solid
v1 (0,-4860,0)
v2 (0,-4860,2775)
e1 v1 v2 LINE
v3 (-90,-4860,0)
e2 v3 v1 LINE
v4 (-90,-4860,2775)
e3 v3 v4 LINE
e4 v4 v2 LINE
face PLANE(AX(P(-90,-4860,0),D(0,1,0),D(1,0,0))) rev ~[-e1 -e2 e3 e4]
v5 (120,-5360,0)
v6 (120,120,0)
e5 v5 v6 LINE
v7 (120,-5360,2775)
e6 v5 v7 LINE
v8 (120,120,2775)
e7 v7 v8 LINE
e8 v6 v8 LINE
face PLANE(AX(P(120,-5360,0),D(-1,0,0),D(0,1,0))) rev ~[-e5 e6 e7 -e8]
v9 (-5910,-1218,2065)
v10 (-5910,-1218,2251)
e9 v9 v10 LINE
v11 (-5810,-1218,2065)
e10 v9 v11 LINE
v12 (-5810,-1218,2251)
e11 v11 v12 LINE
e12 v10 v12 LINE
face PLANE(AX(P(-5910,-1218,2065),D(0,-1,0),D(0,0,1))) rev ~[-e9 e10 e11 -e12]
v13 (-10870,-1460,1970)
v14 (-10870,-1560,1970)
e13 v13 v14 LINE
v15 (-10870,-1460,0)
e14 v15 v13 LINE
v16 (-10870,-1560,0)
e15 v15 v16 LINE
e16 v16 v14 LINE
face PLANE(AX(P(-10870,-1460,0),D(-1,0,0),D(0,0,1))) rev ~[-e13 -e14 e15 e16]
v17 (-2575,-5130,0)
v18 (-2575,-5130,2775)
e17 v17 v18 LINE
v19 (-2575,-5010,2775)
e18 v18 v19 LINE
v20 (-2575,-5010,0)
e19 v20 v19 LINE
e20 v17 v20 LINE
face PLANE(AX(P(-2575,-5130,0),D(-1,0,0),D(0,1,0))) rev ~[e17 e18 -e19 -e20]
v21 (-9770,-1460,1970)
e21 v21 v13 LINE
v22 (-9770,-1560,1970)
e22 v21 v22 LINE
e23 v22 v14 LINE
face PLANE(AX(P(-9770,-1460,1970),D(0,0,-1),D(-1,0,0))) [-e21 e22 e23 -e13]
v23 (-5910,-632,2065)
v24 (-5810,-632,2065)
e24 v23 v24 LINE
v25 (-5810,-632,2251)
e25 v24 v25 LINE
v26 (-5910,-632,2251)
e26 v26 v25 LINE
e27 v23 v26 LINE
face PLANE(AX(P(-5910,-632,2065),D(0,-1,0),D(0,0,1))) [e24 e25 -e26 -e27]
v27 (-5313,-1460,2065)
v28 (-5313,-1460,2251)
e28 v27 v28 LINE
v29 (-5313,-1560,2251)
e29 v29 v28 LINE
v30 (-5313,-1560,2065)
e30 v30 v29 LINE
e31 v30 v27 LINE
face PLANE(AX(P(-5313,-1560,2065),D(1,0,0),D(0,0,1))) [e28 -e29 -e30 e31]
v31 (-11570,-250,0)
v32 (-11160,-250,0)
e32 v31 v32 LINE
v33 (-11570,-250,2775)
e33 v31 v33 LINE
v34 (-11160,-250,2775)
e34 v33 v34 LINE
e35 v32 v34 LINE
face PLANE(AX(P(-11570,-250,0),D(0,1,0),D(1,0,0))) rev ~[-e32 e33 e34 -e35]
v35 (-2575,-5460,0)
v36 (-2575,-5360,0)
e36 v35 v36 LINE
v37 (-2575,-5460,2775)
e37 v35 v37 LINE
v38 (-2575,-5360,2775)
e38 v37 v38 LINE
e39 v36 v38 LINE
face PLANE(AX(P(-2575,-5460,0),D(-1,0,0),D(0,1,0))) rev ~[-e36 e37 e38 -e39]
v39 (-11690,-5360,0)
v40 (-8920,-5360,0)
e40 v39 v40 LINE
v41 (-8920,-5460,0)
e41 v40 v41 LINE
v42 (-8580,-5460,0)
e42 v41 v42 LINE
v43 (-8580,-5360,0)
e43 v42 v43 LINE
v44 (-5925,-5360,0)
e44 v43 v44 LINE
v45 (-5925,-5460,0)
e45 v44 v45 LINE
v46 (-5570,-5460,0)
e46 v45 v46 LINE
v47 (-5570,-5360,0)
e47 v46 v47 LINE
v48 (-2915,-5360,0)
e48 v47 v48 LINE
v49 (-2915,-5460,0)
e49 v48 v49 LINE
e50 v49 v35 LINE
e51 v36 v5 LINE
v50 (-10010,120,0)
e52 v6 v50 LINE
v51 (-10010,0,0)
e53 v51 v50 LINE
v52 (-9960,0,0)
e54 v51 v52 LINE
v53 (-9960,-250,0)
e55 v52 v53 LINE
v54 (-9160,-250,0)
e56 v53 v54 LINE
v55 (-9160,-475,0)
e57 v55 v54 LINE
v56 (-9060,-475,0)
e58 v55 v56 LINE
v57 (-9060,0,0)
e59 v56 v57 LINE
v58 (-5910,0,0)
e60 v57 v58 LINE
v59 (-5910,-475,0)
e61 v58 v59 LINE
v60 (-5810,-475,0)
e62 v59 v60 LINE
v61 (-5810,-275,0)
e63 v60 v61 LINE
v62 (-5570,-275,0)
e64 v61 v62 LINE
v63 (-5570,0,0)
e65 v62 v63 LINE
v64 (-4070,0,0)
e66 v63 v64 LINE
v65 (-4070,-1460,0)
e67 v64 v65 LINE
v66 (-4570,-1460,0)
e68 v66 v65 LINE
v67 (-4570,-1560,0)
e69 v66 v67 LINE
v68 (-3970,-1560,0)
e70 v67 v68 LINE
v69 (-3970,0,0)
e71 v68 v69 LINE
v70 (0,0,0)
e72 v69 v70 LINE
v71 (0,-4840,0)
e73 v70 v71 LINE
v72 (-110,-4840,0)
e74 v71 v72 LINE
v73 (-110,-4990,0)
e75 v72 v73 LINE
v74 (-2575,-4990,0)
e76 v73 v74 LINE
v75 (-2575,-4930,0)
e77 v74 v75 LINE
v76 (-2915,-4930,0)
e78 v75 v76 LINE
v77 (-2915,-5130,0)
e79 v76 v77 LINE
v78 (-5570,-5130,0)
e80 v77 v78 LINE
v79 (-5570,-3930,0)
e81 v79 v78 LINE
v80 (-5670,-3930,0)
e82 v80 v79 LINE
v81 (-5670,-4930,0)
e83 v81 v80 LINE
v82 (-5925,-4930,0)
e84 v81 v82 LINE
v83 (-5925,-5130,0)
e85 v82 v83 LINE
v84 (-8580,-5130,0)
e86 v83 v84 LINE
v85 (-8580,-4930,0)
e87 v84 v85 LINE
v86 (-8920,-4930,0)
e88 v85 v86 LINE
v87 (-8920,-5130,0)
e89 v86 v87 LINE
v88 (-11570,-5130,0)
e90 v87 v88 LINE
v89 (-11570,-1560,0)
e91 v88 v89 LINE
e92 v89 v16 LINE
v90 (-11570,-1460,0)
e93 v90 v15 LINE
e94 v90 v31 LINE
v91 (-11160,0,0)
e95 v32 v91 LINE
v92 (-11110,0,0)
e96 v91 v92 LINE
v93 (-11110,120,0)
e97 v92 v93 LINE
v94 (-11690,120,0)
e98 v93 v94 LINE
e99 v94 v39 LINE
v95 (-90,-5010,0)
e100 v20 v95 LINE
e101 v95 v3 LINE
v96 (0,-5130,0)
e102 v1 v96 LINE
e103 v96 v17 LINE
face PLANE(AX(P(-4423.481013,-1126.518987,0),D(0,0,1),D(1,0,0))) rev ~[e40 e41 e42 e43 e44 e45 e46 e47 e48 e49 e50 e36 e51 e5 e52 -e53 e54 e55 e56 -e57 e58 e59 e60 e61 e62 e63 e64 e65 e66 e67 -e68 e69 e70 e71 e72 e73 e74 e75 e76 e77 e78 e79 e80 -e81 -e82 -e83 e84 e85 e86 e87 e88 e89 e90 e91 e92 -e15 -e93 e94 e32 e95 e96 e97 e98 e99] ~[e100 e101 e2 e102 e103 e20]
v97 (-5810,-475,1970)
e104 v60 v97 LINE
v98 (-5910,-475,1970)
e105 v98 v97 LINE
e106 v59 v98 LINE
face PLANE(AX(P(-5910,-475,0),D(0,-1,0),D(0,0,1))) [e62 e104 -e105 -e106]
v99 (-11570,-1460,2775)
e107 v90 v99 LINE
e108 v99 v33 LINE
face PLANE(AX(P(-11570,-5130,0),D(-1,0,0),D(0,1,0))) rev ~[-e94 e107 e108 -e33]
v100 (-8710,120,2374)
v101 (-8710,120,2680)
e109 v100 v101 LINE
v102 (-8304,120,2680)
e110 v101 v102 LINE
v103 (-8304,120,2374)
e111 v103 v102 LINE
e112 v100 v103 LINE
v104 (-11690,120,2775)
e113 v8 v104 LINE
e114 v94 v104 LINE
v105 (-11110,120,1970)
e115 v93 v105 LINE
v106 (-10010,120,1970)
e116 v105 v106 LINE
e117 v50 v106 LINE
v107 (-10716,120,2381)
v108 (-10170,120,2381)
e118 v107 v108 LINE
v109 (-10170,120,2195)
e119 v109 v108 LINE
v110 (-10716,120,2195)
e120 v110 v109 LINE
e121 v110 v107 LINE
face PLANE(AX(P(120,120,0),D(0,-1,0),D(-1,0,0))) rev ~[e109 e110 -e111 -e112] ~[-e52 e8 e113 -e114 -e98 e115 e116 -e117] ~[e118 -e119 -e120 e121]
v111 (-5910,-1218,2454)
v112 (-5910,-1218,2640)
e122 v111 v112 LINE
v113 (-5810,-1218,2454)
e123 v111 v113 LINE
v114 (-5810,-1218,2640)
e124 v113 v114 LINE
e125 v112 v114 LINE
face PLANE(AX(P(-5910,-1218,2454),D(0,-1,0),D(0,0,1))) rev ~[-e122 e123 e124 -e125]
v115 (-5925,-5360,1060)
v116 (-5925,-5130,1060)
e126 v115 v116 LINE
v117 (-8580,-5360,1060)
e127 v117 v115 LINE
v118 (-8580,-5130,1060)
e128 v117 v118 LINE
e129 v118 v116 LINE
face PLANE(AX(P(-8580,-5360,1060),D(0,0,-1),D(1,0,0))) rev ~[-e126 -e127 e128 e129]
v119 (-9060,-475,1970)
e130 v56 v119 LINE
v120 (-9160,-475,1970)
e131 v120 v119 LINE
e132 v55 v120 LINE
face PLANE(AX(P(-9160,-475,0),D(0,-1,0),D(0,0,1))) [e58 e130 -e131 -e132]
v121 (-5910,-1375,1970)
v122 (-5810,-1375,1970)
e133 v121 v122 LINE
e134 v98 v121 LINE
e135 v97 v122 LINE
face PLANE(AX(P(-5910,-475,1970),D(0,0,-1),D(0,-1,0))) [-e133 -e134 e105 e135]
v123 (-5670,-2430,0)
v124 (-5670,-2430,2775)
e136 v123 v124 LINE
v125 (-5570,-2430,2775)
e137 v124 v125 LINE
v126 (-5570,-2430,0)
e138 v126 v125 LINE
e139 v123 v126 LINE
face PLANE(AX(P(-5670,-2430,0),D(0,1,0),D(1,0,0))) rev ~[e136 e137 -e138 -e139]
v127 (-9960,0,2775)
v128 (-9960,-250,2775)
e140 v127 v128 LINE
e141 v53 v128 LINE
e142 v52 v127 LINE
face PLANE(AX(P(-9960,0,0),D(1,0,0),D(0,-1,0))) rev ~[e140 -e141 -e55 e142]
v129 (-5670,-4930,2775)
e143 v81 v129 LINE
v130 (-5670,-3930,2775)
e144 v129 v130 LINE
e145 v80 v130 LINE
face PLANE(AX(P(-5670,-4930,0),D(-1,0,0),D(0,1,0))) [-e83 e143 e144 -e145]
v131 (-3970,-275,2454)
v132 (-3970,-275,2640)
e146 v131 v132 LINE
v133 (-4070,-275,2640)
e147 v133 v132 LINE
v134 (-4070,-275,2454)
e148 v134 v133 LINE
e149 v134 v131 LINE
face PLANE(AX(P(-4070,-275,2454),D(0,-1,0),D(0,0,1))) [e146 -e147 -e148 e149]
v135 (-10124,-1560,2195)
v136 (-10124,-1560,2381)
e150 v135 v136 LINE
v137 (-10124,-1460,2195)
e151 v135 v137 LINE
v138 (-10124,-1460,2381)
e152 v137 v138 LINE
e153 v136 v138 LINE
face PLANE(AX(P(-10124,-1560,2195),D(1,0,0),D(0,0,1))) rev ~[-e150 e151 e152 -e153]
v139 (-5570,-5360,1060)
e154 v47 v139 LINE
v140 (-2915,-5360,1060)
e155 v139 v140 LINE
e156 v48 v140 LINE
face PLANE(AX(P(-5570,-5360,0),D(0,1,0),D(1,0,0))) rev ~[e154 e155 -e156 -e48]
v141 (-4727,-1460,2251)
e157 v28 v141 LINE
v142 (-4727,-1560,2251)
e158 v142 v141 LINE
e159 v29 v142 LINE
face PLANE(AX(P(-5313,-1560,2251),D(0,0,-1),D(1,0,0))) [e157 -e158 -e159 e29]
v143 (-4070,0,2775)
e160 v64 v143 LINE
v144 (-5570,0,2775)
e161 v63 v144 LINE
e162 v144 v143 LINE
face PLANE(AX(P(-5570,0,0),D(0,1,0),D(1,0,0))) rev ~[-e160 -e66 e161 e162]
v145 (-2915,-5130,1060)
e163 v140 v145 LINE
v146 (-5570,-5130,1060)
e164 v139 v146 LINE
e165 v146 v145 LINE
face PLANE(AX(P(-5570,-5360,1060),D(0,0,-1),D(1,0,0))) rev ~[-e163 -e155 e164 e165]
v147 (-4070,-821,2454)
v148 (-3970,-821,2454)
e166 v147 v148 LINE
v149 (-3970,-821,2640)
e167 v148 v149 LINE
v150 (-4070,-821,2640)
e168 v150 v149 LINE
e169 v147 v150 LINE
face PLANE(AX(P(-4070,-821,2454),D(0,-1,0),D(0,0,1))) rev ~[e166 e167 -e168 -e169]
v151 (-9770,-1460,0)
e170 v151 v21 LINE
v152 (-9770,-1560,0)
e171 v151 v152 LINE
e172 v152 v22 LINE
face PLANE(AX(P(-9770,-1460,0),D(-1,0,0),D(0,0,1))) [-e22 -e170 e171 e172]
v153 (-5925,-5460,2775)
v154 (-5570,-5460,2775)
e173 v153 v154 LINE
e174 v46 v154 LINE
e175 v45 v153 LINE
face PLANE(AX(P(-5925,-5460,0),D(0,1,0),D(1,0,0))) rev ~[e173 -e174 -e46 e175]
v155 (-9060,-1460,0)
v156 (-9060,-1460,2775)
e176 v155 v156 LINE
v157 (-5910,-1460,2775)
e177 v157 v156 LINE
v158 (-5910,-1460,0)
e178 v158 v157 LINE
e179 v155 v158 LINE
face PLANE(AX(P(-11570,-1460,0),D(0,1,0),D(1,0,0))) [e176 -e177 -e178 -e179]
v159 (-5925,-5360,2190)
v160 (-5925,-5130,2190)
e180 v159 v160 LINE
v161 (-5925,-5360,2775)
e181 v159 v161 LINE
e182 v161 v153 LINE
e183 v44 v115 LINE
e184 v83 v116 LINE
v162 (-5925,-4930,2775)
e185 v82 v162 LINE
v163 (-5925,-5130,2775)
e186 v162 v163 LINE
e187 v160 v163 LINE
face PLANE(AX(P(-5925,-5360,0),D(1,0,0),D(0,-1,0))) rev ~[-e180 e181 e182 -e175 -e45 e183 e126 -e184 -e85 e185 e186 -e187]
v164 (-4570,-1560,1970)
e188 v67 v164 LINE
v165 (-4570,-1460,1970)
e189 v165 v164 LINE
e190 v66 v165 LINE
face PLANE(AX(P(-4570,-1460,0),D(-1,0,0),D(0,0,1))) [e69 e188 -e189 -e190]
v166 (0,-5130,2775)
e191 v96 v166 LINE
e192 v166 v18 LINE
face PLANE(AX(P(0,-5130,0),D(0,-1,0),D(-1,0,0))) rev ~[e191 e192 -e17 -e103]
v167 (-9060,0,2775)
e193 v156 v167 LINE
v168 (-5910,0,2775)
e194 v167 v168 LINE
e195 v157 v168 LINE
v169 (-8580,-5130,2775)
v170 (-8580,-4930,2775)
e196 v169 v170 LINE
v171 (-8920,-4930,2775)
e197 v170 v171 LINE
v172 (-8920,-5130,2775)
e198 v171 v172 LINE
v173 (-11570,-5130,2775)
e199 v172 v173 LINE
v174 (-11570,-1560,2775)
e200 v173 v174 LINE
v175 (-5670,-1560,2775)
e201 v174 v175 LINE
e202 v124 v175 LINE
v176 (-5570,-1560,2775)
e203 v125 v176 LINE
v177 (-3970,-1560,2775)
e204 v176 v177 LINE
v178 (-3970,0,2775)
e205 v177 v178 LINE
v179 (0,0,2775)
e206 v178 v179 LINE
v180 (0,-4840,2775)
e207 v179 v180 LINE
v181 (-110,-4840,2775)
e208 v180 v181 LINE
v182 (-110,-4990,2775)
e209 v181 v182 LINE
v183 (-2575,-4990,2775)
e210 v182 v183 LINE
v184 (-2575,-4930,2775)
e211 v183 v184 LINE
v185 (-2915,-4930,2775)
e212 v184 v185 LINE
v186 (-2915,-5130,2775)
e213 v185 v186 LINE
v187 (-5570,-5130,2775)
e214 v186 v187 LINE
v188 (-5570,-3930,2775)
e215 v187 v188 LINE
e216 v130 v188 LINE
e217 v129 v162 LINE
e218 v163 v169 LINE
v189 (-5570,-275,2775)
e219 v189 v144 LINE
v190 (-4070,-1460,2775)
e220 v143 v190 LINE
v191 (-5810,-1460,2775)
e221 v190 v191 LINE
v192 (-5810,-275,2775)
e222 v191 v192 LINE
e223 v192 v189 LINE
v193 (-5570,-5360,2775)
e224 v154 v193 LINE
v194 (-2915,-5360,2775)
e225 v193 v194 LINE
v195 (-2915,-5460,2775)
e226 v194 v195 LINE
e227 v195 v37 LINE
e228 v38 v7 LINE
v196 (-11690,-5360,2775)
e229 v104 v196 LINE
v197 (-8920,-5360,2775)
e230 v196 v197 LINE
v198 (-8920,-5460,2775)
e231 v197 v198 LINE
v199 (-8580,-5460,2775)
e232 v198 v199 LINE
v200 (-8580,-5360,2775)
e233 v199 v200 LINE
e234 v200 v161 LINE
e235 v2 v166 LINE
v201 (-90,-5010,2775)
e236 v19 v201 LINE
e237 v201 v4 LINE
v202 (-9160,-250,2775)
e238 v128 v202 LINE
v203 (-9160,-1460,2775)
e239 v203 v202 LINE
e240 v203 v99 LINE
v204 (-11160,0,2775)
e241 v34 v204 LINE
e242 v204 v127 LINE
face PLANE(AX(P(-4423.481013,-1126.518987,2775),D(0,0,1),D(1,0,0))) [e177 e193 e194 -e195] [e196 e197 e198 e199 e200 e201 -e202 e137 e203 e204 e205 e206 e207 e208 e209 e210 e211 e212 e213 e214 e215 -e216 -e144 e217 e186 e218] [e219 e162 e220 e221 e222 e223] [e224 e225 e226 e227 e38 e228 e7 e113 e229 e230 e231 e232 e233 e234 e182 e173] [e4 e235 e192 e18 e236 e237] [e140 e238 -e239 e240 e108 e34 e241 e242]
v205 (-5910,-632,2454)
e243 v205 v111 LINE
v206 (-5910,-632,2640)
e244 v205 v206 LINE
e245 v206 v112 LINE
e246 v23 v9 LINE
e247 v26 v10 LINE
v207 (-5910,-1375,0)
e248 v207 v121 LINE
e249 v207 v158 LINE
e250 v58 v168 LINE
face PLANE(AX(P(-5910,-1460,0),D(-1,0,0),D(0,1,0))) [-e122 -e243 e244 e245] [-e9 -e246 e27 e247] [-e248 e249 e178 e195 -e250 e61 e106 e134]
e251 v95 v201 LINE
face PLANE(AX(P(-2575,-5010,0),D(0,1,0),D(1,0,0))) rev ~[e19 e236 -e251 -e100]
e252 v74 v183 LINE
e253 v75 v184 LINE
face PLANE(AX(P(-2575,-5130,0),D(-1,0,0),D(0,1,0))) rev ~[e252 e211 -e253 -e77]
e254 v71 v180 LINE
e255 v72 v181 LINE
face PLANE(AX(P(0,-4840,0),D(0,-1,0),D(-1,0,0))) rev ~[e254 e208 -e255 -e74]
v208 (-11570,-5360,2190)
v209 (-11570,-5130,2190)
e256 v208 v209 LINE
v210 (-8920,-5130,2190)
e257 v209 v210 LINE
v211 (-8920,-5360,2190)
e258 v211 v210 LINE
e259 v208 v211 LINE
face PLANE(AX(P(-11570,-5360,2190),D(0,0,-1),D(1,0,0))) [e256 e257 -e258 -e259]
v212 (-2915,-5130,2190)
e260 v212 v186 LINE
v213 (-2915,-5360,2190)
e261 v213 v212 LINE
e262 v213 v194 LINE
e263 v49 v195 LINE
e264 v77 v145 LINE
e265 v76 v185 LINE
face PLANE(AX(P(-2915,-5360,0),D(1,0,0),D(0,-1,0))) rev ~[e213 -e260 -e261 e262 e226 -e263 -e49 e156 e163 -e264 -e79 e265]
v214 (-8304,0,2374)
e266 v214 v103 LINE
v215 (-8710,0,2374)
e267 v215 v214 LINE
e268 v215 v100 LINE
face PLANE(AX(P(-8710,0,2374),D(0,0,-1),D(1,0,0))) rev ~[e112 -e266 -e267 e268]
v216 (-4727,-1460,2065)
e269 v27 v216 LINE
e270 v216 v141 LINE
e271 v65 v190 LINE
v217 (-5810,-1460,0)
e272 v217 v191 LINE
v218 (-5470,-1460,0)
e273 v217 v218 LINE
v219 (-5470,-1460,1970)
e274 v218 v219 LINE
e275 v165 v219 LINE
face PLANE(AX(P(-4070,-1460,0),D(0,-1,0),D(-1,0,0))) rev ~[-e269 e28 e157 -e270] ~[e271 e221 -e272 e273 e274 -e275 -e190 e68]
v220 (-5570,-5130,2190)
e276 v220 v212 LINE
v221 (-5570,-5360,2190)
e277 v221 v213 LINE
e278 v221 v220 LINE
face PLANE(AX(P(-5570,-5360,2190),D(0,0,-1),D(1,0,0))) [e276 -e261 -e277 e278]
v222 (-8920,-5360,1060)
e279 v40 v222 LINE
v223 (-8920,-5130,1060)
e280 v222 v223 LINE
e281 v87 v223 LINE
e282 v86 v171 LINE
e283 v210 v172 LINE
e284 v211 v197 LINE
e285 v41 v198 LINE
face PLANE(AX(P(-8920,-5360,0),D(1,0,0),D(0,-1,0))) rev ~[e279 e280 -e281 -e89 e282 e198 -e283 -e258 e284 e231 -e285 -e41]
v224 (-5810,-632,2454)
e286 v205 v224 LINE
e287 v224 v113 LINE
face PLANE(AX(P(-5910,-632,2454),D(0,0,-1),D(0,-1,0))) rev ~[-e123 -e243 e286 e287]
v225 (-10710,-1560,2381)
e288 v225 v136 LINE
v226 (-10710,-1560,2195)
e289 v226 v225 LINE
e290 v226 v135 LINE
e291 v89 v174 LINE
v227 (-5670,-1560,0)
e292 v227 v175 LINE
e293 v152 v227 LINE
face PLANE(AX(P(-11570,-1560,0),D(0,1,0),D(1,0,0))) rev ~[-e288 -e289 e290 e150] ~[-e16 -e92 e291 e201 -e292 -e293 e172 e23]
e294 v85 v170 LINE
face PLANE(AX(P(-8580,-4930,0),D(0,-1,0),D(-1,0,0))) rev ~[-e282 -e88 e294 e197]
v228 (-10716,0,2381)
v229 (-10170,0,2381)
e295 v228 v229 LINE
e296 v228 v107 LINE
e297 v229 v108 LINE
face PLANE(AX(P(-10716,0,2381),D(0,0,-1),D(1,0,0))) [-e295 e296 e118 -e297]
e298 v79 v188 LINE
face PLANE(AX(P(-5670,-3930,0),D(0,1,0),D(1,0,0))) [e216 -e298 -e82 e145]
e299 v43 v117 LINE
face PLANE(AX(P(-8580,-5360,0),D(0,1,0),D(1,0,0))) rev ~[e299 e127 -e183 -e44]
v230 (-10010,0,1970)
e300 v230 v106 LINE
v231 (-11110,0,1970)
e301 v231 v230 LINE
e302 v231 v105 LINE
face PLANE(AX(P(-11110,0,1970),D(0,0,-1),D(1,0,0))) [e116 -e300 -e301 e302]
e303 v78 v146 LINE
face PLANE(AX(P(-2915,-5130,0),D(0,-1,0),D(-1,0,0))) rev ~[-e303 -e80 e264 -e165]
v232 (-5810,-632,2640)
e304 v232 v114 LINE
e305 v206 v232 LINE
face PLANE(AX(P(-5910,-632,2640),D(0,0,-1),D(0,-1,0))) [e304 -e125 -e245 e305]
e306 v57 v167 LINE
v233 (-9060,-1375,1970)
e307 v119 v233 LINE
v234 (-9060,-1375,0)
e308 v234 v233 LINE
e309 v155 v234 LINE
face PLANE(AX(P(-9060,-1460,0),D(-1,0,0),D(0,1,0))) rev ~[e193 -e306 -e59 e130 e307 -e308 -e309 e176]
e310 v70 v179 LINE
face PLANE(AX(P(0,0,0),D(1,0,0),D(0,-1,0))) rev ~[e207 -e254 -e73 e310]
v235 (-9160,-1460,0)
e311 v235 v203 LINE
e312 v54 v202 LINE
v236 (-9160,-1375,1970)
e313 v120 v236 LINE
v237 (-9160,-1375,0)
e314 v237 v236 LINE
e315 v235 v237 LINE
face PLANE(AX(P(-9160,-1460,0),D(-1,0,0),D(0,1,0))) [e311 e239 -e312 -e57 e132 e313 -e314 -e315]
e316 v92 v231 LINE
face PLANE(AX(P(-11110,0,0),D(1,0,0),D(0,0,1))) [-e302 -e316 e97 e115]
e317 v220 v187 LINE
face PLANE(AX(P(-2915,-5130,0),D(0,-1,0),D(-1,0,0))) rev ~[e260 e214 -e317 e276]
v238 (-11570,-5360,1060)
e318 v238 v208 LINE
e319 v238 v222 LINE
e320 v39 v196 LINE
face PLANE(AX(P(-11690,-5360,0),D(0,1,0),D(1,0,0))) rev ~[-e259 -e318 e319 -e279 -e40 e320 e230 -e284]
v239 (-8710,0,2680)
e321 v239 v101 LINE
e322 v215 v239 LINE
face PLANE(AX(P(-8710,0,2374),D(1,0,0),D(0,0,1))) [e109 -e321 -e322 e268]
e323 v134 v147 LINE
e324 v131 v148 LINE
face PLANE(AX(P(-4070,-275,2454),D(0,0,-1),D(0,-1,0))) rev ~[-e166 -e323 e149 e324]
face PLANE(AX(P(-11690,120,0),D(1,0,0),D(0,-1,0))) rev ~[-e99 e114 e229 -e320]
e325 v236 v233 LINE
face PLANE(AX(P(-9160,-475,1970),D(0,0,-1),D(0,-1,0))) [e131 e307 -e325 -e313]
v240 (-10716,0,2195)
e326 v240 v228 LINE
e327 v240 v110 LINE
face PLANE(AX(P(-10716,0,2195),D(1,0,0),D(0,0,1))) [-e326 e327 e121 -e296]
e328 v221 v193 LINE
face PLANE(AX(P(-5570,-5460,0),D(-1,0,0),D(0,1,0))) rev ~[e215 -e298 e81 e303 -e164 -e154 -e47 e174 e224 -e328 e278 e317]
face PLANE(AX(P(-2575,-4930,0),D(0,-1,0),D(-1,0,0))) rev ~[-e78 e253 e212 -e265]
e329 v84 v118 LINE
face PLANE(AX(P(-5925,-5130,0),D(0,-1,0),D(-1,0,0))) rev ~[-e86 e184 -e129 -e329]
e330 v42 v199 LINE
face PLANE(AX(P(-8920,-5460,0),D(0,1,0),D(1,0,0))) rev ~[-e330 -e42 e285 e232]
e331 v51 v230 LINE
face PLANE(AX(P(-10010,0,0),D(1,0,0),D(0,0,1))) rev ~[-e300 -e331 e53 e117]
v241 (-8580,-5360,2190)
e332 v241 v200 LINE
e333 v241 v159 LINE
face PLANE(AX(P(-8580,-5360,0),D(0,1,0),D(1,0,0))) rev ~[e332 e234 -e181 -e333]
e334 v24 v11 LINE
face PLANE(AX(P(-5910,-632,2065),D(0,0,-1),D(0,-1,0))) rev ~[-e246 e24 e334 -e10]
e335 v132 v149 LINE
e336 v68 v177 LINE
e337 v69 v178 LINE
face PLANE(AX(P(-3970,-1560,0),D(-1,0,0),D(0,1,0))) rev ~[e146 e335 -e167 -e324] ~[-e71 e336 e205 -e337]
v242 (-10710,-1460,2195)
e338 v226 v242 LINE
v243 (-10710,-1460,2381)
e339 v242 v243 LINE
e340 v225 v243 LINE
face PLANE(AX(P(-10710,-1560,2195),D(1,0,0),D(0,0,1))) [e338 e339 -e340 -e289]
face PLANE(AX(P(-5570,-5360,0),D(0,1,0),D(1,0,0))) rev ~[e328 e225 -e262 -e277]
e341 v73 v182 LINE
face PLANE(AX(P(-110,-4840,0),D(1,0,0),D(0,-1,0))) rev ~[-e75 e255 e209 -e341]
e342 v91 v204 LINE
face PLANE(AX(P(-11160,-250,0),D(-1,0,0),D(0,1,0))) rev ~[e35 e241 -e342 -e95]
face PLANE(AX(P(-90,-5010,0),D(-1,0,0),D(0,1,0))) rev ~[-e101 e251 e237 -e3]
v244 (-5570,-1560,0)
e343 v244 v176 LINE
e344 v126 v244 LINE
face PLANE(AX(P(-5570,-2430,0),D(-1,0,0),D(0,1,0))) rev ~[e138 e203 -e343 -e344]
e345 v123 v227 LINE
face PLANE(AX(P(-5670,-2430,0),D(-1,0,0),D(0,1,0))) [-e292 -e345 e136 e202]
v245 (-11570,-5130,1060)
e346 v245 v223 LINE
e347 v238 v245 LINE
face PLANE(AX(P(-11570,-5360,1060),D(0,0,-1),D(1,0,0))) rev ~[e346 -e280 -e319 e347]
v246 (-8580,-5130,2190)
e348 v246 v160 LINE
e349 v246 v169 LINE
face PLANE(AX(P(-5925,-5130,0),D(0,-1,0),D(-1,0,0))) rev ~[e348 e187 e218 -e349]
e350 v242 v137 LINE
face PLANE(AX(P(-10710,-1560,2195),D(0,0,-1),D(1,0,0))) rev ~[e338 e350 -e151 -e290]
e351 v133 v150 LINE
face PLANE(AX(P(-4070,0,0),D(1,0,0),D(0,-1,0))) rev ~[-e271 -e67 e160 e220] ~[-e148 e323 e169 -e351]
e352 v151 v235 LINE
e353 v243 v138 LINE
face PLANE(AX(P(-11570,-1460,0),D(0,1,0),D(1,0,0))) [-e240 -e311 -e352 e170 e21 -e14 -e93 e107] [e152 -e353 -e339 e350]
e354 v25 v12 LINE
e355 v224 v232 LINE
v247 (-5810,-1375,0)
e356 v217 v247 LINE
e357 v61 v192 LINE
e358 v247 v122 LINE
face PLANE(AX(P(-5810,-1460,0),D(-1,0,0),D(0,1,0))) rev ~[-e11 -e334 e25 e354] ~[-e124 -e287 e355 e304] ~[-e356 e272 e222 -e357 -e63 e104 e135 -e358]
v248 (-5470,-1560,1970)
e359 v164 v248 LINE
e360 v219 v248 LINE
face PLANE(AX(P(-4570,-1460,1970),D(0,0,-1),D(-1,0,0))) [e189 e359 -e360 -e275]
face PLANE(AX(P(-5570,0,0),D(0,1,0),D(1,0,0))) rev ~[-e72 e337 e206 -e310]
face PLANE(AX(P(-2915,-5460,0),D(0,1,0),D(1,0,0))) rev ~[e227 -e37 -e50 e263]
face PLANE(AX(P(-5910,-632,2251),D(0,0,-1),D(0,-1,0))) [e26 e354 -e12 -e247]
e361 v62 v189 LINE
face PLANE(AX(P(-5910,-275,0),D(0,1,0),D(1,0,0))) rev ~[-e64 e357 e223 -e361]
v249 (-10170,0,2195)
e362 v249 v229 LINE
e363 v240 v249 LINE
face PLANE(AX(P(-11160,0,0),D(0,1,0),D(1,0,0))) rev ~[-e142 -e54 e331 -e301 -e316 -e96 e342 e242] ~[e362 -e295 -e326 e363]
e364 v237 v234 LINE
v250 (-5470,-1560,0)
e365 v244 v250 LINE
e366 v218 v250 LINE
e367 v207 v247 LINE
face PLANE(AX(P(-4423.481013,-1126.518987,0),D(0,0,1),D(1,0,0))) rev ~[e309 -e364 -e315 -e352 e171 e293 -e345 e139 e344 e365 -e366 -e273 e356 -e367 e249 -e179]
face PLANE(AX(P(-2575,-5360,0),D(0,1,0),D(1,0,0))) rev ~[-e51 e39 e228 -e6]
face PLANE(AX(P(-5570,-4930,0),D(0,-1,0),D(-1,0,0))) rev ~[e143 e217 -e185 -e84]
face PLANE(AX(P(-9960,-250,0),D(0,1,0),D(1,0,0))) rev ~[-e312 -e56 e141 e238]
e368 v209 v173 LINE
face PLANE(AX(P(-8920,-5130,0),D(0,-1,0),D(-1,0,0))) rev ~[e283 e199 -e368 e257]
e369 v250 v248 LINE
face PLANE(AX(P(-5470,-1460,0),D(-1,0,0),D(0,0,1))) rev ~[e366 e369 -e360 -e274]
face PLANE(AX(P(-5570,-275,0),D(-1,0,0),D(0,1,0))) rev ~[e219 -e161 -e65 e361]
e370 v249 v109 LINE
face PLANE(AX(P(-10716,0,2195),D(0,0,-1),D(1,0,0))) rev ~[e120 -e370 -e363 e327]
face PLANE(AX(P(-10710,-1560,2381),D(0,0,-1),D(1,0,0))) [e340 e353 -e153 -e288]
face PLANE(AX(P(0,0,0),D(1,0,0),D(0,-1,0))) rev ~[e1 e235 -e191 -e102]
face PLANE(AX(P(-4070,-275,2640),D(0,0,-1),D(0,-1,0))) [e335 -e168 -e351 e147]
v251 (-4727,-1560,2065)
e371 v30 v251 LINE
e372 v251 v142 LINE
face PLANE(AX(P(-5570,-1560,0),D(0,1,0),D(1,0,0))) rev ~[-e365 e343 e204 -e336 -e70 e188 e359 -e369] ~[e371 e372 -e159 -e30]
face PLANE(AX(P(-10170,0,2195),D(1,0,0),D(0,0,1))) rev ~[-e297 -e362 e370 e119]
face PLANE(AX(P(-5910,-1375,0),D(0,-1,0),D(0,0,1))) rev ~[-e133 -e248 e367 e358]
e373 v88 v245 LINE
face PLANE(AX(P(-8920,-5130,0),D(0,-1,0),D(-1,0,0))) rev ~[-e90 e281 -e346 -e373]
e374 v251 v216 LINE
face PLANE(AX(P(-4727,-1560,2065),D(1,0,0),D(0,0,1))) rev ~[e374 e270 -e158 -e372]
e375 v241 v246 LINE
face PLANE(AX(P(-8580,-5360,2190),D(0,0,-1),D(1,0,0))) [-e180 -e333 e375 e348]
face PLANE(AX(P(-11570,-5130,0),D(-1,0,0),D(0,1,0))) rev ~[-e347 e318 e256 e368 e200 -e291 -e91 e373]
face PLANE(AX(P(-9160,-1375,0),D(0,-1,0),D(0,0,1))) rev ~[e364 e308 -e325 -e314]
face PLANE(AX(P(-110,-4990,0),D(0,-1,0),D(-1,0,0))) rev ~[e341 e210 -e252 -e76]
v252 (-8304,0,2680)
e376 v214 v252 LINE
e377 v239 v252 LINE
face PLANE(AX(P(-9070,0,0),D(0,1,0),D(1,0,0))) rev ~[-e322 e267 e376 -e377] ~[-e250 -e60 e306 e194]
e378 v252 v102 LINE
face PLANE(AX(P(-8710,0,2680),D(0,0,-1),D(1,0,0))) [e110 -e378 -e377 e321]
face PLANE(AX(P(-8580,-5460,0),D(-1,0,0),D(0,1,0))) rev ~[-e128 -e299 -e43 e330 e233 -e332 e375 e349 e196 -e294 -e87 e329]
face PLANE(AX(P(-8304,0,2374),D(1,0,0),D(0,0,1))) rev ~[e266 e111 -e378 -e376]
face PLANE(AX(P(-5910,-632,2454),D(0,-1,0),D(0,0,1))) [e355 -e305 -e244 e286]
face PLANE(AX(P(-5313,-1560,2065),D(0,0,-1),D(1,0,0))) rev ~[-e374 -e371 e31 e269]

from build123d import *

# Parameters (mm, degrees)
F1_DEPTH  = 2775
F2_W      = 1100
F2_H      = 1970
F3_DEPTH  = 120
F4_W      = 100
F4_H      = 1000
F5_DEPTH  = 2775
F4_H_2    = 970
F6_W      = 5900
F6_H      = 100
F7_DEPTH  = 2775
F8_W      = 100
F8_H      = 1460
F9_DEPTH  = 2775
F10_W     = 1100
F10_H     = 1970
F11_DEPTH = 100
F12_W     = 900
F12_H     = 1970
F13_DEPTH = 100
F14_W     = 100
F14_H     = 1185
F15_DEPTH = 2775
F16_W     = 900
F16_H     = 1970
F17_DEPTH = 100
F19_DEPTH = 2775
F20_W     = 900
F20_H     = 1970
F21_DEPTH = 100
F22_W     = 2655
F22_H     = 1130
F23_DEPTH = 230
F24_W     = 2650
F24_H     = 1130
F24_W_2   = 2655
F25_DEPTH = 230
F26_W     = 406
F26_H     = 306
F27_DEPTH = 120
F28_W     = 546
F28_H     = 186
F29_DEPTH = 100
F30_W     = 586
F30_H     = 186
F31_DEPTH = 100
F32_W     = 546
F32_H     = 186
F33_DEPTH = 120
F34_W     = 586
F34_H     = 186
F35_DEPTH = 100
F37_DEPTH = 2775
F38_W     = 586
F38_H     = 186
F39_DEPTH = 100


# Not quite as in the source:
# - a feature names something its author has since deleted; it is built from what else it names


with BuildPart() as f1:
    # F0 (on Top) → F1 (new body)
    with BuildSketch(Plane.XY):
        Polygon((120, 120), (-11690, 120), (-11690, -5360), (-8920, -5360), (-8920, -5460), (-8580, -5460), (-8580, -5360), (-5925, -5360), (-5925, -5460), (-5570, -5460), (-5570, -5360), (-2915, -5360), (-2915, -5460), (-2575, -5460), (-2575, -5360), (120, -5360), align=None)
        Polygon((-5570, 0), (0, 0), (0, -5130), (-2575, -5130), (-2575, -4930), (-2915, -4930), (-2915, -5130), (-5570, -5130), (-5570, -4930), (-5925, -4930), (-5925, -5130), (-8580, -5130), (-8580, -4930), (-8920, -4930), (-8920, -5130), (-11570, -5130), (-11570, -250), (-11160, -250), (-11160, 0), (-9960, 0), (-9960, -250), (-9070, -250), (-9070, 0), (-5910, 0), (-5910, -275), (-5570, -275), align=None, mode=Mode.SUBTRACT)
    extrude(amount=F1_DEPTH)

    # F2 (on face) → F3 (cut, through all)
    with BuildSketch(Plane.XZ):
        with Locations((-10560, 985)):
            Rectangle(F2_W, F2_H)
    extrude(amount=-F3_DEPTH, mode=Mode.SUBTRACT)

    # F4 (on Top) → F5 (join, through all)
    with BuildSketch(Plane.XY):
        with Locations((-5620, -4430)):
            Rectangle(F4_W, F4_H)
    extrude(amount=F5_DEPTH)



with BuildPart() as f5:
    # F4 (on Top) → F5, piece 2 (new body, through all)
    with BuildSketch(Plane.XY):
        with Locations((-5620, -1945)):
            Rectangle(F4_W, F4_H_2)
    extrude(amount=F5_DEPTH)


with BuildPart() as f1_1:
    add(f1.part)

    add(f5.part)  # F7 merges F5
    # F6 (on Top) → F7 (join, through all)
    with BuildSketch(Plane.XY):
        with Locations((-8620, -1510)):
            Rectangle(F6_W, F6_H)
    extrude(amount=F7_DEPTH)

    # F8 (on Top) → F9 (join, through all)
    with BuildSketch(Plane.XY):
        with Locations((-9110, -730)):
            Rectangle(F8_W, F8_H)
    extrude(amount=F9_DEPTH)

    # F10 (on face) → F11 (cut, through all)
    with BuildSketch(Plane(origin=(0, -1460, 0), x_dir=(-1, 0, 0), z_dir=(0, 1, 0))):
        with Locations((10320, 985)):
            Rectangle(F10_W, F10_H)
    extrude(amount=-F11_DEPTH, mode=Mode.SUBTRACT)

    # F12 (on face) → F13 (cut, through all)
    with BuildSketch(Plane(origin=(-9160, 0, 0), x_dir=(0, -1, 0), z_dir=(-1, 0, 0))):
        with Locations((924.9999999999, 985)):
            Rectangle(F12_W, F12_H)
    extrude(amount=-F13_DEPTH, mode=Mode.SUBTRACT)

    # F14 (on Top) → F15 (join, through all)
    with BuildSketch(Plane.XY):
        with Locations((-5860, -867.5)):
            Rectangle(F14_W, F14_H)
    extrude(amount=F15_DEPTH)

    # F16 (on face) → F17 (cut, through all)
    with BuildSketch(Plane(origin=(-5910, 0, 0), x_dir=(0, -1, 0), z_dir=(-1, 0, 0))):
        with Locations((925, 985)):
            Rectangle(F16_W, F16_H)
    extrude(amount=-F17_DEPTH, mode=Mode.SUBTRACT)

    # F18 (on Top) → F19 (join, through all)
    with BuildSketch(Plane.XY):
        Polygon((-5570, -1460), (-5570, -1560), (-3970, -1560), (-3970, 0), (-4070, 0), (-4070, -1460), align=None)
    extrude(amount=F19_DEPTH)

    # F20 (on face) → F21 (cut, through all)
    with BuildSketch(Plane(origin=(0, -1460, 0), x_dir=(-1, 0, 0), z_dir=(0, 1, 0))):
        with Locations((5020, 985)):
            Rectangle(F20_W, F20_H)
    extrude(amount=-F21_DEPTH, mode=Mode.SUBTRACT)

    # F22 (on face) → F23 (cut, through all)
    with BuildSketch(Plane.XZ.offset(5360)):
        with Locations((-4242.5, 1625)):
            Rectangle(F22_W, F22_H)
    extrude(amount=-F23_DEPTH, mode=Mode.SUBTRACT)

    # F24 (on face) → F25 (cut, through all)
    with BuildSketch(Plane.XZ.offset(5360)):
        with Locations((-10245, 1625)):
            Rectangle(F24_W, F24_H)
        with Locations((-7252.5, 1625)):
            Rectangle(F24_W_2, F24_H)
    extrude(amount=-F25_DEPTH, mode=Mode.SUBTRACT)

    # F26 (on face) → F27 (cut, through all)
    with BuildSketch(Plane.XZ):
        with Locations((-8507, 2527)):
            Rectangle(F26_W, F26_H)
    extrude(amount=-F27_DEPTH, mode=Mode.SUBTRACT)

    # F28 (on face) → F29 (cut, through all)
    with BuildSketch(Plane(origin=(-4070, 0, 0), x_dir=(0, -1, 0), z_dir=(-1, 0, 0))):
        with Locations((548, 2547)):
            Rectangle(F28_W, F28_H)
    extrude(amount=-F29_DEPTH, mode=Mode.SUBTRACT)

    # F30 (on face) → F31 (cut, through all)
    with BuildSketch(Plane(origin=(-5910, 0, 0), x_dir=(0, -1, 0), z_dir=(-1, 0, 0))):
        with Locations((925, 2547)):
            Rectangle(F30_W, F30_H)
        with Locations((925, 2158)):
            Rectangle(F30_W, F30_H)
    extrude(amount=-F31_DEPTH, mode=Mode.SUBTRACT)

    # F32 (on face) → F33 (cut, through all)
    with BuildSketch(Plane.XZ):
        with Locations((-10443, 2288)):
            Rectangle(F32_W, F32_H)
    extrude(amount=-F33_DEPTH, mode=Mode.SUBTRACT)

    # F34 (on face) → F35 (cut, through all)
    with BuildSketch(Plane.XZ.offset(1560)):
        with Locations((-10417, 2288)):
            Rectangle(F34_W, F34_H)
    extrude(amount=-F35_DEPTH, mode=Mode.SUBTRACT)

    # F36 (on Top) → F37 (join, through all)
    with BuildSketch(Plane.XY):
        Polygon((-110, -4990), (-2575, -4990), (-2575, -5010), (-90, -5010), (-90, -4860), (0, -4860), (0, -4840), (-110, -4840), align=None)
    extrude(amount=F37_DEPTH)

    # F38 (on face) → F39 (cut, through all)
    with BuildSketch(Plane.XZ.offset(1560)):
        with Locations((-5020, 2158)):
            Rectangle(F38_W, F38_H)
    extrude(amount=-F39_DEPTH, mode=Mode.SUBTRACT)


solid = f1_1.part
